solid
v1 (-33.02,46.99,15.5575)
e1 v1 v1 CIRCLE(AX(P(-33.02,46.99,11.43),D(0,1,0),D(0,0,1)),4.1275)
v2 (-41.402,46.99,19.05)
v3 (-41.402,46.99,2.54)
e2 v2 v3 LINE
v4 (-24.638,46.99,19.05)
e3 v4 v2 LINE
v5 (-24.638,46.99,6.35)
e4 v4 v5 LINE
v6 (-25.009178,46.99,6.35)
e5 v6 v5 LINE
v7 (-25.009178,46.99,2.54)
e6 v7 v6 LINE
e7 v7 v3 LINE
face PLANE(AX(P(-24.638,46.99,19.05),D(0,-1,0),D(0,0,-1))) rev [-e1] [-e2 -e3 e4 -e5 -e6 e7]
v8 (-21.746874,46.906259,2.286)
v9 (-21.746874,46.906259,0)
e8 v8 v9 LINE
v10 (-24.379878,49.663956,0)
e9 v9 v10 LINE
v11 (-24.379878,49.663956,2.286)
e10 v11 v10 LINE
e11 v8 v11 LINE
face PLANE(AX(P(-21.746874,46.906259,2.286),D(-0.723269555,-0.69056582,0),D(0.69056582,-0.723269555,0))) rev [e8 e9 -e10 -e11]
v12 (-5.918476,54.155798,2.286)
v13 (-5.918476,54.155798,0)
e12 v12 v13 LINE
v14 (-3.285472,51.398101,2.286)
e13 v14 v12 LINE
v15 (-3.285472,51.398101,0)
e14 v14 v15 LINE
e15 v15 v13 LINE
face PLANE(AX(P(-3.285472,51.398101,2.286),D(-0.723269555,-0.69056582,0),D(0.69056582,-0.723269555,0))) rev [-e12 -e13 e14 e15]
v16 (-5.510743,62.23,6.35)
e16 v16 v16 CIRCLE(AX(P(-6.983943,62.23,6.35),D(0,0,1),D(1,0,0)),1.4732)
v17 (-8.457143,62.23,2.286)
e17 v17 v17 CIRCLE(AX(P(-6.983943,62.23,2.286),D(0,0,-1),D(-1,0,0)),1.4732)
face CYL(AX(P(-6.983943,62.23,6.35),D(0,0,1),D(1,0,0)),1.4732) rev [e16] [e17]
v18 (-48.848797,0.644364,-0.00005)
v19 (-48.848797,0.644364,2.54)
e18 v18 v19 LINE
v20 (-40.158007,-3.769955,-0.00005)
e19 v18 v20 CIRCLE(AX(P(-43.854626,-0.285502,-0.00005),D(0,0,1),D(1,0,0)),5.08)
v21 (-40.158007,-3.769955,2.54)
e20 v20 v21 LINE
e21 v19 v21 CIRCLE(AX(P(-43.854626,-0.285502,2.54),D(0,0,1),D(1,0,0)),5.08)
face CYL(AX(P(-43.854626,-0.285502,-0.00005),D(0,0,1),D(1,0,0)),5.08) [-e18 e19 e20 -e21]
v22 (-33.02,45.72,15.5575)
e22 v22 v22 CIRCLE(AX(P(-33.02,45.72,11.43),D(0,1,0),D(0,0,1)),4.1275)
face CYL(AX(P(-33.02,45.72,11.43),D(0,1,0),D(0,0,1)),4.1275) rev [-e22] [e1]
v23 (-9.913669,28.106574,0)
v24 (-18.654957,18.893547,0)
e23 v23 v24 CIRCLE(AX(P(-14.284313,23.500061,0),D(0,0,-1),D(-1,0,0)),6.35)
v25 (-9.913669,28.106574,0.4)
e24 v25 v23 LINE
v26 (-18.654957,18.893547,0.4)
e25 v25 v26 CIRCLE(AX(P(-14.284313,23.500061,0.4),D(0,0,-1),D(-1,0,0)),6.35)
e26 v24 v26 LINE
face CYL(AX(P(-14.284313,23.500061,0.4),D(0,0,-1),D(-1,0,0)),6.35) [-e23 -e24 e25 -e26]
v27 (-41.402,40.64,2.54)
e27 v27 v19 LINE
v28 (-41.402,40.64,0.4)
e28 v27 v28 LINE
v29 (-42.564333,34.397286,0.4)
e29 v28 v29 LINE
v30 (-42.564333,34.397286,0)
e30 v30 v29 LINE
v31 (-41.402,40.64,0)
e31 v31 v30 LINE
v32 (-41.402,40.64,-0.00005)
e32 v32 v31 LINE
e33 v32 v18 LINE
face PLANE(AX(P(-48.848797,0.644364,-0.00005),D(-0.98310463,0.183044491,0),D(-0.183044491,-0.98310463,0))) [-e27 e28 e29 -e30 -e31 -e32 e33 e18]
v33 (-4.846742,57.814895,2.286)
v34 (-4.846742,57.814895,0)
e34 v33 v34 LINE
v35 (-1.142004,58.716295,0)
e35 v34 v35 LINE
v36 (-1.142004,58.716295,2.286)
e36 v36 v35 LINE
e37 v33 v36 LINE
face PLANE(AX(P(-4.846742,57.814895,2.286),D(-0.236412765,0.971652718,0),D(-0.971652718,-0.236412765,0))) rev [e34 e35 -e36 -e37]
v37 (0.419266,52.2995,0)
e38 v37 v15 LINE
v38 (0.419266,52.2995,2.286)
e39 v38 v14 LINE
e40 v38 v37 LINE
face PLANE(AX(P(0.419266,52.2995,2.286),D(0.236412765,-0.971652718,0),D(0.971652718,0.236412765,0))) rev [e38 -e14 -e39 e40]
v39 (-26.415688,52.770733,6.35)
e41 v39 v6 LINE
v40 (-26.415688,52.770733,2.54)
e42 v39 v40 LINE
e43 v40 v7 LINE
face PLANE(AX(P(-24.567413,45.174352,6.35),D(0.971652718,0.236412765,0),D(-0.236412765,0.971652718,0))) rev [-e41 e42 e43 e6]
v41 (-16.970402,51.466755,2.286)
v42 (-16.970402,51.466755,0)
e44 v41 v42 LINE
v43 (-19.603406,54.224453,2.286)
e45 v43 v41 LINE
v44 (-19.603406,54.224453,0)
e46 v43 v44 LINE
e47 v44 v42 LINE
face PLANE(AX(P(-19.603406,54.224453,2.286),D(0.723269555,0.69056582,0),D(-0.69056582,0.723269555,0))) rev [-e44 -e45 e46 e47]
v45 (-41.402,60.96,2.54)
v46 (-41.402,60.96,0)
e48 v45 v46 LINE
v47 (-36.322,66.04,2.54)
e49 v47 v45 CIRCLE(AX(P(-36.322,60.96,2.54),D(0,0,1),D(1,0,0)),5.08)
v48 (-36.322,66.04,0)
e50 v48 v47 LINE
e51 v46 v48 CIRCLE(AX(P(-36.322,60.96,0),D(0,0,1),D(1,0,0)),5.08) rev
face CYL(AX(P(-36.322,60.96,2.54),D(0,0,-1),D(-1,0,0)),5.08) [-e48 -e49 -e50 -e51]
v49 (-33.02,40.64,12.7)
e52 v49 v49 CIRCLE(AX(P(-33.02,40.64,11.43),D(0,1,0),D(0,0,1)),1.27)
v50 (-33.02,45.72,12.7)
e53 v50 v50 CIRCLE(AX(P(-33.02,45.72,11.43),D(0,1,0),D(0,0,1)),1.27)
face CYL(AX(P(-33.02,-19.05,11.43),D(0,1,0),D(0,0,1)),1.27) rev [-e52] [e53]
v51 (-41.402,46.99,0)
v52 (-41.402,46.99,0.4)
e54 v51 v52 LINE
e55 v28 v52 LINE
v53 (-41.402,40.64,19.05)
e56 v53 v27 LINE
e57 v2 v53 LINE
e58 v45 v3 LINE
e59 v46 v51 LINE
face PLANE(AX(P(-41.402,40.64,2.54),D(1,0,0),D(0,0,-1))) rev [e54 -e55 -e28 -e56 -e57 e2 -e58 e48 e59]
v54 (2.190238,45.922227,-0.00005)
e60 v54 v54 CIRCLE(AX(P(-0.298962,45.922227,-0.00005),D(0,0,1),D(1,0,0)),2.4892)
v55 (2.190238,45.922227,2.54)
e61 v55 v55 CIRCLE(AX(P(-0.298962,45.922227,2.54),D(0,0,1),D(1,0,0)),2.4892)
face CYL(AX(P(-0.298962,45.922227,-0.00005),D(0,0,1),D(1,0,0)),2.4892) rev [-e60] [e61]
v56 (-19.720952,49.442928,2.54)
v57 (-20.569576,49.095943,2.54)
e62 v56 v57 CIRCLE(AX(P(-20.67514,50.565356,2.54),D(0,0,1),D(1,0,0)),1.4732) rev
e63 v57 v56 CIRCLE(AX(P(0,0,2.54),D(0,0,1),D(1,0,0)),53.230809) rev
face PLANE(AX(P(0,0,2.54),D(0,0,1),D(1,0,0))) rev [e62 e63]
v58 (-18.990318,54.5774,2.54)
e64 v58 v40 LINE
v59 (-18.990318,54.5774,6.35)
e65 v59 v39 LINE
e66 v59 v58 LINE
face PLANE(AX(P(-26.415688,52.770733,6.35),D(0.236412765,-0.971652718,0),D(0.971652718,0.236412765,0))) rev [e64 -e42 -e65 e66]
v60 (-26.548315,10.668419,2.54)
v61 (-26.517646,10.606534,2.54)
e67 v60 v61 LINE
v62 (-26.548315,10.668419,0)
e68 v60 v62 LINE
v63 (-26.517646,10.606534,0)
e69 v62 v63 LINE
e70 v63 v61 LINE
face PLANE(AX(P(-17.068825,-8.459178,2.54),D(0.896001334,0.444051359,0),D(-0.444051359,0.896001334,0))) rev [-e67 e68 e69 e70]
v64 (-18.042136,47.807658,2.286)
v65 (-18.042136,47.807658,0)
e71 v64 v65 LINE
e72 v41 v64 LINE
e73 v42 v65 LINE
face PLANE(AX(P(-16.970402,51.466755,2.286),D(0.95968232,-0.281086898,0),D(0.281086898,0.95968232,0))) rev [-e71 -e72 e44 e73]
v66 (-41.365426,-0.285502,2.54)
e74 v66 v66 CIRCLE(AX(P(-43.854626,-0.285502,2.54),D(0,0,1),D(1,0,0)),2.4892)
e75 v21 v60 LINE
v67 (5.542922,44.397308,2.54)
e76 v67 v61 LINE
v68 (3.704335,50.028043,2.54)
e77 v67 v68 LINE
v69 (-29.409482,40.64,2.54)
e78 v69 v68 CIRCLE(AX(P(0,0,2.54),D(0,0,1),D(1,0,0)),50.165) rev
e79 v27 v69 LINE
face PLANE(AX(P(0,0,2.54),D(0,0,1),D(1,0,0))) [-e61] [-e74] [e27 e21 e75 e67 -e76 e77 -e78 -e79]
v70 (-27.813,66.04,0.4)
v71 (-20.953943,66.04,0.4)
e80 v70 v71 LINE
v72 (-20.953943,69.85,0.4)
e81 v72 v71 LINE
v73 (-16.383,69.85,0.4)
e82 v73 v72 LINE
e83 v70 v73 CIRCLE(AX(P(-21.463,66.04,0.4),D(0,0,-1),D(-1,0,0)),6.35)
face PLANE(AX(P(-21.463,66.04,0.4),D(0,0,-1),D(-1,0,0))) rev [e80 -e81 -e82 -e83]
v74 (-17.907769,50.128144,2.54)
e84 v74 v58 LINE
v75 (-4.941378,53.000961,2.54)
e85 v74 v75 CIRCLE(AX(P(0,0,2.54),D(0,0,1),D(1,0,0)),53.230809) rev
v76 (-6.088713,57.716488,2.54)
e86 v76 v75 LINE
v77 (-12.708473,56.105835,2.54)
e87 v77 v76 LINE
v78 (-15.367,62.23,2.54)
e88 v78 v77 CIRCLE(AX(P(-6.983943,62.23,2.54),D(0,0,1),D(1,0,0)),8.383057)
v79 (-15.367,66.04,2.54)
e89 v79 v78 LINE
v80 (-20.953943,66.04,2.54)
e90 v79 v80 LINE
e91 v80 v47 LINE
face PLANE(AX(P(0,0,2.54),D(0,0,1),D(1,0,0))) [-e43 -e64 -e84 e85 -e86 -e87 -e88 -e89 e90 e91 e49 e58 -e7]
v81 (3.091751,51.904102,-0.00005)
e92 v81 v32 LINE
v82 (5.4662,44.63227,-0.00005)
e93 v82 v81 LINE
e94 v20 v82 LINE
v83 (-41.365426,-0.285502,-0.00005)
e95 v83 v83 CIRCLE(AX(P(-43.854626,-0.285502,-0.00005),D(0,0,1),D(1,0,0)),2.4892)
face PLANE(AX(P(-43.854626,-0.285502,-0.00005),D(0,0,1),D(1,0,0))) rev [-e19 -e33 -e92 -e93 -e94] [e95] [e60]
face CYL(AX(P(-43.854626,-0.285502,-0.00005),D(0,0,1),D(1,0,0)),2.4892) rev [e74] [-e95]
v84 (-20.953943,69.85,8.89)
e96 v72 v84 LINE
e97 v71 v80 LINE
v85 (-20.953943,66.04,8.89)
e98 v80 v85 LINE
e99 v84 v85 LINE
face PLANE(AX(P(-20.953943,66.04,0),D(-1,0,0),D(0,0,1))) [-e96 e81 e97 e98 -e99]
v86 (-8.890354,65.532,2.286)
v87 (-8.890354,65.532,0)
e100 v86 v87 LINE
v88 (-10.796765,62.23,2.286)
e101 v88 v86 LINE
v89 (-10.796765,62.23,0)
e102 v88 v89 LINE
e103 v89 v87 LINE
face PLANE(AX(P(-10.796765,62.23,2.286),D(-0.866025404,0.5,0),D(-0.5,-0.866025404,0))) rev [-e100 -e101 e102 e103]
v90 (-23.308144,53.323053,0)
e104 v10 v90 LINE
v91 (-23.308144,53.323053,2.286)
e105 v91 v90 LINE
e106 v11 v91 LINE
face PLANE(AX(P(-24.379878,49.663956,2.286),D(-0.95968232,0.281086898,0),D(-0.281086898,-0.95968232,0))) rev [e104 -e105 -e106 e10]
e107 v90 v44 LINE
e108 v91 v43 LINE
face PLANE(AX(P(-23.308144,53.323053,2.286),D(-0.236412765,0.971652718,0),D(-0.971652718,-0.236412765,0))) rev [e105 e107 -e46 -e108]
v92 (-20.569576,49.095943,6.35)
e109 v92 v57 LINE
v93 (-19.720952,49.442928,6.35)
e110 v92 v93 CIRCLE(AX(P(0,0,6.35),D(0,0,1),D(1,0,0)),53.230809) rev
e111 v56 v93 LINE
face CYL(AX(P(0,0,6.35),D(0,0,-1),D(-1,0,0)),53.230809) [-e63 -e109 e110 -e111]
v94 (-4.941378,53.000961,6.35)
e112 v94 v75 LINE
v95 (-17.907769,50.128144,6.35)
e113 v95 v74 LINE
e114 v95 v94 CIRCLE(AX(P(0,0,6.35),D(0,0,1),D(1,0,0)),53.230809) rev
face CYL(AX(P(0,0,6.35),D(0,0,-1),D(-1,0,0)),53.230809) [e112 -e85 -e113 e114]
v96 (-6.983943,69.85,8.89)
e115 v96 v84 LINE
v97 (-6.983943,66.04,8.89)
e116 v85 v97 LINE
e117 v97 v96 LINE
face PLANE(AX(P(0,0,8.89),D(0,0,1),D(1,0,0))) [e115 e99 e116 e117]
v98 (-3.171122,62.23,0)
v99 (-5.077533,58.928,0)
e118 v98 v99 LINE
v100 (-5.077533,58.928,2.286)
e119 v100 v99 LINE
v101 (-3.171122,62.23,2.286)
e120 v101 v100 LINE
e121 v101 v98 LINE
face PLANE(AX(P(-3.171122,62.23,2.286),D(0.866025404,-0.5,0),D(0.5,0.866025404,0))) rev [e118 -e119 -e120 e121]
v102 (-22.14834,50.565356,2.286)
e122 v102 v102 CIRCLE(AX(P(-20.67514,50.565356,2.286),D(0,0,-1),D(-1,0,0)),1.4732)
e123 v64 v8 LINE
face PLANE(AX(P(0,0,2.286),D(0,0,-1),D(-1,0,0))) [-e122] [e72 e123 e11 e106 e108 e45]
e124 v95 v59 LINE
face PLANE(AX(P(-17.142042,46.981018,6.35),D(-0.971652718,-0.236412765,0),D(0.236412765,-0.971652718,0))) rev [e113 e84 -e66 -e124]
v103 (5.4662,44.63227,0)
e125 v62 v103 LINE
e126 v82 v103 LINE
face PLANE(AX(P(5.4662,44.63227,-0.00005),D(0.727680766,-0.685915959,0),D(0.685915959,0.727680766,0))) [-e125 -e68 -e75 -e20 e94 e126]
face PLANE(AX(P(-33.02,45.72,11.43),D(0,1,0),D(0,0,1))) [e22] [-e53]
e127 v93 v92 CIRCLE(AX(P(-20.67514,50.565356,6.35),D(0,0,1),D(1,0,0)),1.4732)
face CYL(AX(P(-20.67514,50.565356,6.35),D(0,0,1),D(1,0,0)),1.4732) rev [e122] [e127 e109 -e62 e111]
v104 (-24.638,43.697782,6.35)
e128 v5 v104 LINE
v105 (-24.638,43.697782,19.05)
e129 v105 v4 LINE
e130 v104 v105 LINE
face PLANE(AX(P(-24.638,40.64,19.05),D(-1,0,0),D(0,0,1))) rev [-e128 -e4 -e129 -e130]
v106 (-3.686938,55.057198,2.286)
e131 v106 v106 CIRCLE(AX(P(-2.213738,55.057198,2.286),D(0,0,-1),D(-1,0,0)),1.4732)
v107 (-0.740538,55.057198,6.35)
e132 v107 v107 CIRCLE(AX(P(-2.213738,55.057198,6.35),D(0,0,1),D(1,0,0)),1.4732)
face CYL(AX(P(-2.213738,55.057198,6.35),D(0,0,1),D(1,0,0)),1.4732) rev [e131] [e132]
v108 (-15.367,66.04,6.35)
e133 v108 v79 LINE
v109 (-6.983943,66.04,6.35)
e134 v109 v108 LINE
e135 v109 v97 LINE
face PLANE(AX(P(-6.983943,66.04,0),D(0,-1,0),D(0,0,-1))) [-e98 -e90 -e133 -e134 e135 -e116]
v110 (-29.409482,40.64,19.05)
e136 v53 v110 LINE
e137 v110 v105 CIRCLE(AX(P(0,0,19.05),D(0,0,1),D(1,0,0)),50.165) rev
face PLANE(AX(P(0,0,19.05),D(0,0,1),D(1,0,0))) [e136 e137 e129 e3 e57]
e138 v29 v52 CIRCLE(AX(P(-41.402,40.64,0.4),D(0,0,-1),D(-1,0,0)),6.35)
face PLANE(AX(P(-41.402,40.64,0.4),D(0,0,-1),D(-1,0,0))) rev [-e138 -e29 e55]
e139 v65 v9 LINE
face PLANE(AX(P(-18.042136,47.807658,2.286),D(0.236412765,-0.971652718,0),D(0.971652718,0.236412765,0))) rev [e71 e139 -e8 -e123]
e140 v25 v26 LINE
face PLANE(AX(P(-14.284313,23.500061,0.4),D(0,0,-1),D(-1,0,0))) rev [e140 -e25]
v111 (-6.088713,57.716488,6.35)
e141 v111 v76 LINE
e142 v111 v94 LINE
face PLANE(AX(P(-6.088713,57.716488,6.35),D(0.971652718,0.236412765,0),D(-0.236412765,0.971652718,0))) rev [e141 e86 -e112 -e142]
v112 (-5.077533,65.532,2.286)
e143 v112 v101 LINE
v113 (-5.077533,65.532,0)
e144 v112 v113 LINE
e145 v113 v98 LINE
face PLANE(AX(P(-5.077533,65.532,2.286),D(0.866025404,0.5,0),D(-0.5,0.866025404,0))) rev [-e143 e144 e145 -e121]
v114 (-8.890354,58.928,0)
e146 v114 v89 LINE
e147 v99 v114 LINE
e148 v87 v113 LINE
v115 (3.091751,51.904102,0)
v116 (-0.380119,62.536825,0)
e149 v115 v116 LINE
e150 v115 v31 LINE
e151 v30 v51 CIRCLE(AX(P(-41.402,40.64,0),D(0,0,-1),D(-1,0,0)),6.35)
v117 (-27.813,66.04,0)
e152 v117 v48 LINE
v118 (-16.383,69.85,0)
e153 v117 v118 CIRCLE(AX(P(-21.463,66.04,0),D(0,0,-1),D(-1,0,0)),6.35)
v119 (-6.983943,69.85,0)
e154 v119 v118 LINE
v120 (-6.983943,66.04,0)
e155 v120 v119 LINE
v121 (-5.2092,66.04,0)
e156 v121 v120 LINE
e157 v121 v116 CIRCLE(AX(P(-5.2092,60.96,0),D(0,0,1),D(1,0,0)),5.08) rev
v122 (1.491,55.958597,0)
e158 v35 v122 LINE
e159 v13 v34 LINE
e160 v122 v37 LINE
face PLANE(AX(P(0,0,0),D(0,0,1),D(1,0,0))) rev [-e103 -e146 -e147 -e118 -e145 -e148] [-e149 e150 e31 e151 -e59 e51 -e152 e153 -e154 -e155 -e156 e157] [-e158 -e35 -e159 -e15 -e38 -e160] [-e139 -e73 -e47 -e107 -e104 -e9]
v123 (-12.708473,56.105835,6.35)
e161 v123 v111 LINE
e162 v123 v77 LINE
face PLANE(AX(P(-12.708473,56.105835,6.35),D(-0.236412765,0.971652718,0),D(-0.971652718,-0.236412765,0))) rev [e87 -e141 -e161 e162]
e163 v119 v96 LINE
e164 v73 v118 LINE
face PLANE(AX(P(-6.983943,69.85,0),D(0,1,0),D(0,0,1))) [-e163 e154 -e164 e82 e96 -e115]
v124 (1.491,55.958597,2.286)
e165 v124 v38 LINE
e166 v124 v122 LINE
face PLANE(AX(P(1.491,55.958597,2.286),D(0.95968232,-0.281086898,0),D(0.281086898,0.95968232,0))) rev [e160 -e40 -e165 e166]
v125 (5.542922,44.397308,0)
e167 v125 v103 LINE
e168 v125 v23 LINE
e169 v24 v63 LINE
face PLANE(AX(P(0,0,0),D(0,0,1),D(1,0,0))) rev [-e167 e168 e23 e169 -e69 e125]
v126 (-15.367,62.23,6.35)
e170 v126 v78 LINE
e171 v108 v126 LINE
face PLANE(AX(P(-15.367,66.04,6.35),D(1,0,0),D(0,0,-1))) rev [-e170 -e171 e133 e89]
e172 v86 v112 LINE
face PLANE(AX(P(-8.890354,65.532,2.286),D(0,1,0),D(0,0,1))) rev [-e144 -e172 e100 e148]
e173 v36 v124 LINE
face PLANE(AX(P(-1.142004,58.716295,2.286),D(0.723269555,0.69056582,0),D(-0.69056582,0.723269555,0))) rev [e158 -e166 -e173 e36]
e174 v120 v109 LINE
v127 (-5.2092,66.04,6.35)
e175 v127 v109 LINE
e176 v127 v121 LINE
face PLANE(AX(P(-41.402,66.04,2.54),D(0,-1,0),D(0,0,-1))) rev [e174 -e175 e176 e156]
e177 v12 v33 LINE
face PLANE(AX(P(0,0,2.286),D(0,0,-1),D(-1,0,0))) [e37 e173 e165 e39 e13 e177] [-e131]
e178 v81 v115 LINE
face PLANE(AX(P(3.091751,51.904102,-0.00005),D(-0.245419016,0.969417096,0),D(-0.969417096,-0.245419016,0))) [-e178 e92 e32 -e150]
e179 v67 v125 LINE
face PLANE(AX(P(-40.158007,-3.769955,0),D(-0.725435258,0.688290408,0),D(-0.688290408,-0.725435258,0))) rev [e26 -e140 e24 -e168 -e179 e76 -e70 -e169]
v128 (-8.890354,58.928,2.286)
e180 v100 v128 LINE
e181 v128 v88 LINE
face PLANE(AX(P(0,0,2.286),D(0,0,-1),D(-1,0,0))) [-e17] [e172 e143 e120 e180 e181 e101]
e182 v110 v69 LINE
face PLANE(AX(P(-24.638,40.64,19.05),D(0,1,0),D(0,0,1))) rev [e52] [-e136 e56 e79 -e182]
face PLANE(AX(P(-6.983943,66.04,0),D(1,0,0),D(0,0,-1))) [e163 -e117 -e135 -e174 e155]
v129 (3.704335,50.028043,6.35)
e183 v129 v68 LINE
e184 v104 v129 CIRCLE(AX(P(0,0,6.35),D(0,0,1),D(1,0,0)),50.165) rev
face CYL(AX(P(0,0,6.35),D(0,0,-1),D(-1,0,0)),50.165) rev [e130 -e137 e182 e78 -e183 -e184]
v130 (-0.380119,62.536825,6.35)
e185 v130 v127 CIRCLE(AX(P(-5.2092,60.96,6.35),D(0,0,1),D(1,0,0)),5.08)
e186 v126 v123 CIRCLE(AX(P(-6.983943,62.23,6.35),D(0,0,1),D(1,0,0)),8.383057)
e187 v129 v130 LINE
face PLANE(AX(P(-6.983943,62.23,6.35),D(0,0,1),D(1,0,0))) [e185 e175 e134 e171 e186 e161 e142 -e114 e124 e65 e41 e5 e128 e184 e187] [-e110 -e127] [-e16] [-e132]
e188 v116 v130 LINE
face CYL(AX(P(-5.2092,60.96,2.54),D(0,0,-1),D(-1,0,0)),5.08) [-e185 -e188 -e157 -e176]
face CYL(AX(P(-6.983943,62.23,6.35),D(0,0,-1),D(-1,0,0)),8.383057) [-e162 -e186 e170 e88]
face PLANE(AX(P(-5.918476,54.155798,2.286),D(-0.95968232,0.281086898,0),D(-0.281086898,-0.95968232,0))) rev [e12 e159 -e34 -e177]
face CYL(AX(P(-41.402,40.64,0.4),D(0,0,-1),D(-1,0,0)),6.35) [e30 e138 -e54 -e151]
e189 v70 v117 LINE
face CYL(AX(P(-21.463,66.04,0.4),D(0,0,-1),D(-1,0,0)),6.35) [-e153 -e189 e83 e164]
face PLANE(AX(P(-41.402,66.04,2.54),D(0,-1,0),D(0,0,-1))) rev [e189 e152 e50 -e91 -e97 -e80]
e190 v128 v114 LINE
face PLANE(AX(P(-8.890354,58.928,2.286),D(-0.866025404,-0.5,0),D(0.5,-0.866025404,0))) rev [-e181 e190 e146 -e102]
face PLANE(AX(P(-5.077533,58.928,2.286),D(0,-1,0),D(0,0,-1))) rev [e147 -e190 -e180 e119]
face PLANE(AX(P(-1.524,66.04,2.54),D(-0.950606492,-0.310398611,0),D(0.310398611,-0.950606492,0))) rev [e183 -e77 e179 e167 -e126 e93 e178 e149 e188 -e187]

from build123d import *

# Parameters (mm, degrees)
SKETCH2_R                = 3.81
BOSS_EXTRUDE1_DEPTH      = 2.54
SKETCH5_W                = 16.764
SKETCH5_H                = 6.35
BOSS_EXTRUDE2_DEPTH      = 16.51
SKETCH6_R                = 4.1275
CUT_EXTRUDE2_DEPTH       = 1.27
SKETCH7_R                = 1.27
CUT_EXTRUDE3_DEPTH       = 80.197102245
CUT_EXTRUDE4_DEPTH       = 2.286
BOSS_EXTRUDE3_DEPTH      = 3.81
F_4_CLEARANCE_HOLE1_D    = 2.9464
BOSS_EXTRUDE6_DEPTH      = 6.35
BOSS_EXTRUDE6_DEPTH_BACK = 2.54
SKETCH14_W               = 13.97
SKETCH14_H               = 3.81
FILLET1_R                = 5.08
CUT_EXTRUDE5_DEPTH       = 83.859689862
CUT_EXTRUDE5_DEPTH_BACK  = 83.859689862
SKETCH19_R               = 2.4892
BOSS_EXTRUDE8_DEPTH      = 2.54
CUT_EXTRUDE8_DEPTH       = 2.54
BOSS_EXTRUDE7_DEPTH      = 3.81
CUT_EXTRUDE7_DEPTH       = 87.868867767
SKETCH13_R               = 6.35
PRINT_TABS_DEPTH         = 0.4


# Read off the part's stored shape, not the designer's step: Boss-Extrude7
with BuildPart() as part:
    # Sketch2 → Boss-Extrude1 (new body)
    with BuildSketch(Plane.XY):
        with BuildLine():
            Line((-17.068825413, -8.459178389), (-41.402, 40.64))
            Line((-41.402, 40.64), (-41.402, 66.04))
            Line((-41.402, 66.04), (-1.524, 66.04))
            Line((-1.524, 66.04), (18.109053667, 5.913093546))
            ThreePointArc((18.109053667, 5.913093546), (7.204933647, -17.634949139), (-17.068825413, -8.459178389))
        make_face()
        Circle(SKETCH2_R, mode=Mode.SUBTRACT)
    extrude(amount=BOSS_EXTRUDE1_DEPTH)

    # Sketch5 → Boss-Extrude2 (add)
    with BuildSketch(Plane.XY.offset(2.54)):
        with Locations((-33.02, 43.815)):
            Rectangle(SKETCH5_W, SKETCH5_H)
    extrude(amount=BOSS_EXTRUDE2_DEPTH)

    # Sketch6 → Cut-Extrude2 (cut)
    with BuildSketch(Plane(origin=(0, 46.99, 0), x_dir=(1, 0, 0), z_dir=(0, 1, 0))):
        with Locations(Location((-33.02, -11.43, 0), (0, 0, 270))):
            Circle(SKETCH6_R)
    extrude(amount=-CUT_EXTRUDE2_DEPTH, mode=Mode.SUBTRACT)

    # Sketch7 → Cut-Extrude3 (cut, through all)
    with BuildSketch(Plane(origin=(0, 45.72, 0), x_dir=(1, 0, 0), z_dir=(0, 1, 0))):
        with Locations(Location((-33.02, -11.43, 0), (0, 0, 270))):
            Circle(SKETCH7_R)
    extrude(amount=-CUT_EXTRUDE3_DEPTH, mode=Mode.SUBTRACT)

    # Sketch9 → Cut-Extrude4 (cut)
    with BuildSketch(Plane(origin=(0, 0, 0), x_dir=(-1, 0, 0), z_dir=(0, 0, -1))):
        Polygon((3.171122265, 62.23), (5.077532854, 58.928), (8.890354032, 58.928), (10.796764621, 62.23), (8.890354032, 65.532), (5.077532854, 65.532), align=None)
        Polygon((24.379877895, 49.663956202), (23.308143816, 53.323053276), (19.603405755, 54.224452874), (16.970401774, 51.466755398), (18.042135853, 47.807658324), (21.746873914, 46.906258726), align=None)
        Polygon((5.918476139, 54.15579827), (4.846742059, 57.814895344), (1.142003999, 58.716294942), (-1.490999983, 55.958597466), (-0.419265903, 52.299500392), (3.285472157, 51.398100794), align=None)
    extrude(amount=-CUT_EXTRUDE4_DEPTH, mode=Mode.SUBTRACT)

    # Sketch8 → Boss-Extrude3 (add)
    with BuildSketch(Plane.XY.offset(2.54)):
        with BuildLine():
            Line((-15.367, 66.04), (-6.983943443, 66.04))
            Line((-6.983943443, 66.04), (-1.524, 66.04))
            Line((-1.524, 66.04), (3.09175139, 51.904101595))
            Line((3.09175139, 51.904101595), (-4.240438106, 50.120107003))
            Line((-4.240438106, 50.120107003), (-6.088713216, 57.716488409))
            Line((-6.088713216, 57.716488409), (-12.708473154, 56.10583501))
            ThreePointArc((-12.708473154, 56.10583501), (-14.673699407, 58.891843255), (-15.367, 62.23))
            Line((-15.367, 62.23), (-15.367, 66.04))
        make_face()
        Polygon((-17.142042414, 46.981018422), (-18.990317524, 54.577399829), (-26.415687706, 52.770733449), (-24.567412596, 45.174352043), align=None)
    extrude(amount=BOSS_EXTRUDE3_DEPTH)

    # #4 Clearance Hole1 (through all)
    with Locations(Plane.XY.offset(6.35)):
        with Locations((-6.983943443, 62.23), (-20.675139834, 50.5653558), (-2.213738078, 55.057197868)):
            Hole(F_4_CLEARANCE_HOLE1_D / 2)

    # Sketch14 → Boss-Extrude6 (add, two sides: drawn at the far end of the back side and taken through both)
    with BuildSketch(Plane.XY.offset(2.54).offset(-BOSS_EXTRUDE6_DEPTH_BACK)):
        with Locations((-13.968943443, 67.945)):
            Rectangle(SKETCH14_W, SKETCH14_H)
    extrude(amount=BOSS_EXTRUDE6_DEPTH + BOSS_EXTRUDE6_DEPTH_BACK)

    # Fillet1
    fillet1_edges = [part.edges().sort_by_distance(p)[0] for p in [
        (-41.402, 66.04, 1.27),
        (-1.524, 66.04, 3.175),
    ]]
    fillet(fillet1_edges, radius=FILLET1_R)

    # Sketch15 → Cut-Extrude5 (cut, two sides: drawn at the far end of the back side and taken through both)
    with BuildSketch(Plane.XY.offset(2.54).offset(-CUT_EXTRUDE5_DEPTH_BACK)):
        with BuildLine():
            ThreePointArc((-0.315167053, 48.411374113), (-18.310138041, 44.816284079), (-33.674369734, 34.782140486))
            ThreePointArc((-33.674369734, 34.782140486), (-33.731327517, 31.262340905), (-30.211527936, 31.205383122))
            ThreePointArc((-30.211527936, 31.205383122), (-16.427248714, 40.207684038), (-0.28275743, 43.433079608))
            ThreePointArc((-0.28275743, 43.433079608), (2.190185011, 45.938431672), (-0.315167053, 48.411374113))
        make_face()
    extrude(amount=CUT_EXTRUDE5_DEPTH + CUT_EXTRUDE5_DEPTH_BACK, mode=Mode.SUBTRACT)

    # Sketch19 → Boss-Extrude8 (add, through all)
    with BuildSketch(Plane.XY.offset(2.54)):
        with BuildLine():
            Line((5.466200245, 44.632269783), (-40.158007355, -3.769954845))
            ThreePointArc((-40.158007355, -3.769954845), (-46.15516131, -4.814733016), (-48.848797168, 0.64436424))
            Line((-48.848797168, 0.64436424), (-41.402, 40.64))
            Line((-41.402, 40.64), (3.09175139, 51.904101595))
            Line((3.09175139, 51.904101595), (5.466200245, 44.632269783))
        make_face()
        with Locations((-0.298962241, 45.92222686)):
            Circle(SKETCH19_R, mode=Mode.SUBTRACT)
        with Locations((-43.854625645, -0.285501773)):
            Circle(SKETCH19_R, mode=Mode.SUBTRACT)
    extrude(amount=-BOSS_EXTRUDE8_DEPTH)

    # Sketch20 → Cut-Extrude8 (cut)
    with BuildSketch(Plane.XY.offset(2.54)):
        Polygon((-40.158007355, -3.769954845), (10.729493517, 49.863783044), (48.07174347, 14.433588323), (-7.673080914, -44.319607422), align=None)
    extrude(amount=-CUT_EXTRUDE8_DEPTH, mode=Mode.SUBTRACT)

    # Boss-Extrude7 outline → Boss-Extrude7 (add)
    with BuildSketch(Plane.XY.offset(2.54)):
        with BuildLine():
            ThreePointArc((-19.720952416, 49.442927803), (-20.146011494, 49.271262362), (-20.56957647, 49.095942783))
            ThreePointArc((-20.56957647, 49.095942783), (-20.117584831, 49.201739043), (-19.720952416, 49.442927803))
        make_face()
        with BuildLine():
            ThreePointArc((-24.638, 43.697782335), (-21.550057665, 45.300355844), (-18.358466971, 46.685050235))
            Line((-18.358466971, 46.685050235), (-24.567412596, 45.174352043))
            Line((-24.567412596, 45.174352043), (-24.638, 45.464465155))
            Line((-24.638, 45.464465155), (-24.638, 43.697782335))
        make_face()
        with BuildLine():
            ThreePointArc((-4.941378488, 53.000960864), (-11.514519488, 51.97051967), (-17.907769463, 50.128144457))
            Line((-17.907769463, 50.128144457), (-17.178757335, 47.131916166))
            ThreePointArc((-17.178757335, 47.131916166), (-6.891074176, 49.689438734), (3.704334892, 50.028043416))
            Line((3.704334892, 50.028043416), (3.09175139, 51.904101595))
            Line((3.09175139, 51.904101595), (-4.240438106, 50.120107003))
            Line((-4.240438106, 50.120107003), (-4.941378488, 53.000960864))
        make_face()
    extrude(amount=BOSS_EXTRUDE7_DEPTH)

    # Sketch16 → Cut-Extrude7 (cut, through all)
    with BuildSketch(Plane.XY.offset(2.54)):
        with BuildLine():
            ThreePointArc((-0.326576563, 50.163936974), (-18.972991936, 46.4386994), (-34.893431388, 36.041305068))
            ThreePointArc((-34.893431388, 36.041305068), (-34.990492099, 30.043279251), (-28.992466282, 29.94621854))
            ThreePointArc((-28.992466282, 29.94621854), (-15.764394819, 38.585268717), (-0.271347919, 41.680516747))
            ThreePointArc((-0.271347919, 41.680516747), (3.942747872, 45.949841182), (-0.326576563, 50.163936974))
        make_face()
    extrude(amount=CUT_EXTRUDE7_DEPTH, mode=Mode.SUBTRACT)

    # Sketch13 → Print Tabs (add)
    with BuildSketch(Plane(origin=(0, 0, 0), x_dir=(-1, 0, 0), z_dir=(0, 0, -1))):
        with Locations((14.284313144, 23.500060577)):
            Circle(SKETCH13_R)
        with Locations((21.463, 66.04)):
            Circle(SKETCH13_R)
        with Locations((41.402, 40.64)):
            Circle(SKETCH13_R)
    extrude(amount=-PRINT_TABS_DEPTH)


solid = part.part
